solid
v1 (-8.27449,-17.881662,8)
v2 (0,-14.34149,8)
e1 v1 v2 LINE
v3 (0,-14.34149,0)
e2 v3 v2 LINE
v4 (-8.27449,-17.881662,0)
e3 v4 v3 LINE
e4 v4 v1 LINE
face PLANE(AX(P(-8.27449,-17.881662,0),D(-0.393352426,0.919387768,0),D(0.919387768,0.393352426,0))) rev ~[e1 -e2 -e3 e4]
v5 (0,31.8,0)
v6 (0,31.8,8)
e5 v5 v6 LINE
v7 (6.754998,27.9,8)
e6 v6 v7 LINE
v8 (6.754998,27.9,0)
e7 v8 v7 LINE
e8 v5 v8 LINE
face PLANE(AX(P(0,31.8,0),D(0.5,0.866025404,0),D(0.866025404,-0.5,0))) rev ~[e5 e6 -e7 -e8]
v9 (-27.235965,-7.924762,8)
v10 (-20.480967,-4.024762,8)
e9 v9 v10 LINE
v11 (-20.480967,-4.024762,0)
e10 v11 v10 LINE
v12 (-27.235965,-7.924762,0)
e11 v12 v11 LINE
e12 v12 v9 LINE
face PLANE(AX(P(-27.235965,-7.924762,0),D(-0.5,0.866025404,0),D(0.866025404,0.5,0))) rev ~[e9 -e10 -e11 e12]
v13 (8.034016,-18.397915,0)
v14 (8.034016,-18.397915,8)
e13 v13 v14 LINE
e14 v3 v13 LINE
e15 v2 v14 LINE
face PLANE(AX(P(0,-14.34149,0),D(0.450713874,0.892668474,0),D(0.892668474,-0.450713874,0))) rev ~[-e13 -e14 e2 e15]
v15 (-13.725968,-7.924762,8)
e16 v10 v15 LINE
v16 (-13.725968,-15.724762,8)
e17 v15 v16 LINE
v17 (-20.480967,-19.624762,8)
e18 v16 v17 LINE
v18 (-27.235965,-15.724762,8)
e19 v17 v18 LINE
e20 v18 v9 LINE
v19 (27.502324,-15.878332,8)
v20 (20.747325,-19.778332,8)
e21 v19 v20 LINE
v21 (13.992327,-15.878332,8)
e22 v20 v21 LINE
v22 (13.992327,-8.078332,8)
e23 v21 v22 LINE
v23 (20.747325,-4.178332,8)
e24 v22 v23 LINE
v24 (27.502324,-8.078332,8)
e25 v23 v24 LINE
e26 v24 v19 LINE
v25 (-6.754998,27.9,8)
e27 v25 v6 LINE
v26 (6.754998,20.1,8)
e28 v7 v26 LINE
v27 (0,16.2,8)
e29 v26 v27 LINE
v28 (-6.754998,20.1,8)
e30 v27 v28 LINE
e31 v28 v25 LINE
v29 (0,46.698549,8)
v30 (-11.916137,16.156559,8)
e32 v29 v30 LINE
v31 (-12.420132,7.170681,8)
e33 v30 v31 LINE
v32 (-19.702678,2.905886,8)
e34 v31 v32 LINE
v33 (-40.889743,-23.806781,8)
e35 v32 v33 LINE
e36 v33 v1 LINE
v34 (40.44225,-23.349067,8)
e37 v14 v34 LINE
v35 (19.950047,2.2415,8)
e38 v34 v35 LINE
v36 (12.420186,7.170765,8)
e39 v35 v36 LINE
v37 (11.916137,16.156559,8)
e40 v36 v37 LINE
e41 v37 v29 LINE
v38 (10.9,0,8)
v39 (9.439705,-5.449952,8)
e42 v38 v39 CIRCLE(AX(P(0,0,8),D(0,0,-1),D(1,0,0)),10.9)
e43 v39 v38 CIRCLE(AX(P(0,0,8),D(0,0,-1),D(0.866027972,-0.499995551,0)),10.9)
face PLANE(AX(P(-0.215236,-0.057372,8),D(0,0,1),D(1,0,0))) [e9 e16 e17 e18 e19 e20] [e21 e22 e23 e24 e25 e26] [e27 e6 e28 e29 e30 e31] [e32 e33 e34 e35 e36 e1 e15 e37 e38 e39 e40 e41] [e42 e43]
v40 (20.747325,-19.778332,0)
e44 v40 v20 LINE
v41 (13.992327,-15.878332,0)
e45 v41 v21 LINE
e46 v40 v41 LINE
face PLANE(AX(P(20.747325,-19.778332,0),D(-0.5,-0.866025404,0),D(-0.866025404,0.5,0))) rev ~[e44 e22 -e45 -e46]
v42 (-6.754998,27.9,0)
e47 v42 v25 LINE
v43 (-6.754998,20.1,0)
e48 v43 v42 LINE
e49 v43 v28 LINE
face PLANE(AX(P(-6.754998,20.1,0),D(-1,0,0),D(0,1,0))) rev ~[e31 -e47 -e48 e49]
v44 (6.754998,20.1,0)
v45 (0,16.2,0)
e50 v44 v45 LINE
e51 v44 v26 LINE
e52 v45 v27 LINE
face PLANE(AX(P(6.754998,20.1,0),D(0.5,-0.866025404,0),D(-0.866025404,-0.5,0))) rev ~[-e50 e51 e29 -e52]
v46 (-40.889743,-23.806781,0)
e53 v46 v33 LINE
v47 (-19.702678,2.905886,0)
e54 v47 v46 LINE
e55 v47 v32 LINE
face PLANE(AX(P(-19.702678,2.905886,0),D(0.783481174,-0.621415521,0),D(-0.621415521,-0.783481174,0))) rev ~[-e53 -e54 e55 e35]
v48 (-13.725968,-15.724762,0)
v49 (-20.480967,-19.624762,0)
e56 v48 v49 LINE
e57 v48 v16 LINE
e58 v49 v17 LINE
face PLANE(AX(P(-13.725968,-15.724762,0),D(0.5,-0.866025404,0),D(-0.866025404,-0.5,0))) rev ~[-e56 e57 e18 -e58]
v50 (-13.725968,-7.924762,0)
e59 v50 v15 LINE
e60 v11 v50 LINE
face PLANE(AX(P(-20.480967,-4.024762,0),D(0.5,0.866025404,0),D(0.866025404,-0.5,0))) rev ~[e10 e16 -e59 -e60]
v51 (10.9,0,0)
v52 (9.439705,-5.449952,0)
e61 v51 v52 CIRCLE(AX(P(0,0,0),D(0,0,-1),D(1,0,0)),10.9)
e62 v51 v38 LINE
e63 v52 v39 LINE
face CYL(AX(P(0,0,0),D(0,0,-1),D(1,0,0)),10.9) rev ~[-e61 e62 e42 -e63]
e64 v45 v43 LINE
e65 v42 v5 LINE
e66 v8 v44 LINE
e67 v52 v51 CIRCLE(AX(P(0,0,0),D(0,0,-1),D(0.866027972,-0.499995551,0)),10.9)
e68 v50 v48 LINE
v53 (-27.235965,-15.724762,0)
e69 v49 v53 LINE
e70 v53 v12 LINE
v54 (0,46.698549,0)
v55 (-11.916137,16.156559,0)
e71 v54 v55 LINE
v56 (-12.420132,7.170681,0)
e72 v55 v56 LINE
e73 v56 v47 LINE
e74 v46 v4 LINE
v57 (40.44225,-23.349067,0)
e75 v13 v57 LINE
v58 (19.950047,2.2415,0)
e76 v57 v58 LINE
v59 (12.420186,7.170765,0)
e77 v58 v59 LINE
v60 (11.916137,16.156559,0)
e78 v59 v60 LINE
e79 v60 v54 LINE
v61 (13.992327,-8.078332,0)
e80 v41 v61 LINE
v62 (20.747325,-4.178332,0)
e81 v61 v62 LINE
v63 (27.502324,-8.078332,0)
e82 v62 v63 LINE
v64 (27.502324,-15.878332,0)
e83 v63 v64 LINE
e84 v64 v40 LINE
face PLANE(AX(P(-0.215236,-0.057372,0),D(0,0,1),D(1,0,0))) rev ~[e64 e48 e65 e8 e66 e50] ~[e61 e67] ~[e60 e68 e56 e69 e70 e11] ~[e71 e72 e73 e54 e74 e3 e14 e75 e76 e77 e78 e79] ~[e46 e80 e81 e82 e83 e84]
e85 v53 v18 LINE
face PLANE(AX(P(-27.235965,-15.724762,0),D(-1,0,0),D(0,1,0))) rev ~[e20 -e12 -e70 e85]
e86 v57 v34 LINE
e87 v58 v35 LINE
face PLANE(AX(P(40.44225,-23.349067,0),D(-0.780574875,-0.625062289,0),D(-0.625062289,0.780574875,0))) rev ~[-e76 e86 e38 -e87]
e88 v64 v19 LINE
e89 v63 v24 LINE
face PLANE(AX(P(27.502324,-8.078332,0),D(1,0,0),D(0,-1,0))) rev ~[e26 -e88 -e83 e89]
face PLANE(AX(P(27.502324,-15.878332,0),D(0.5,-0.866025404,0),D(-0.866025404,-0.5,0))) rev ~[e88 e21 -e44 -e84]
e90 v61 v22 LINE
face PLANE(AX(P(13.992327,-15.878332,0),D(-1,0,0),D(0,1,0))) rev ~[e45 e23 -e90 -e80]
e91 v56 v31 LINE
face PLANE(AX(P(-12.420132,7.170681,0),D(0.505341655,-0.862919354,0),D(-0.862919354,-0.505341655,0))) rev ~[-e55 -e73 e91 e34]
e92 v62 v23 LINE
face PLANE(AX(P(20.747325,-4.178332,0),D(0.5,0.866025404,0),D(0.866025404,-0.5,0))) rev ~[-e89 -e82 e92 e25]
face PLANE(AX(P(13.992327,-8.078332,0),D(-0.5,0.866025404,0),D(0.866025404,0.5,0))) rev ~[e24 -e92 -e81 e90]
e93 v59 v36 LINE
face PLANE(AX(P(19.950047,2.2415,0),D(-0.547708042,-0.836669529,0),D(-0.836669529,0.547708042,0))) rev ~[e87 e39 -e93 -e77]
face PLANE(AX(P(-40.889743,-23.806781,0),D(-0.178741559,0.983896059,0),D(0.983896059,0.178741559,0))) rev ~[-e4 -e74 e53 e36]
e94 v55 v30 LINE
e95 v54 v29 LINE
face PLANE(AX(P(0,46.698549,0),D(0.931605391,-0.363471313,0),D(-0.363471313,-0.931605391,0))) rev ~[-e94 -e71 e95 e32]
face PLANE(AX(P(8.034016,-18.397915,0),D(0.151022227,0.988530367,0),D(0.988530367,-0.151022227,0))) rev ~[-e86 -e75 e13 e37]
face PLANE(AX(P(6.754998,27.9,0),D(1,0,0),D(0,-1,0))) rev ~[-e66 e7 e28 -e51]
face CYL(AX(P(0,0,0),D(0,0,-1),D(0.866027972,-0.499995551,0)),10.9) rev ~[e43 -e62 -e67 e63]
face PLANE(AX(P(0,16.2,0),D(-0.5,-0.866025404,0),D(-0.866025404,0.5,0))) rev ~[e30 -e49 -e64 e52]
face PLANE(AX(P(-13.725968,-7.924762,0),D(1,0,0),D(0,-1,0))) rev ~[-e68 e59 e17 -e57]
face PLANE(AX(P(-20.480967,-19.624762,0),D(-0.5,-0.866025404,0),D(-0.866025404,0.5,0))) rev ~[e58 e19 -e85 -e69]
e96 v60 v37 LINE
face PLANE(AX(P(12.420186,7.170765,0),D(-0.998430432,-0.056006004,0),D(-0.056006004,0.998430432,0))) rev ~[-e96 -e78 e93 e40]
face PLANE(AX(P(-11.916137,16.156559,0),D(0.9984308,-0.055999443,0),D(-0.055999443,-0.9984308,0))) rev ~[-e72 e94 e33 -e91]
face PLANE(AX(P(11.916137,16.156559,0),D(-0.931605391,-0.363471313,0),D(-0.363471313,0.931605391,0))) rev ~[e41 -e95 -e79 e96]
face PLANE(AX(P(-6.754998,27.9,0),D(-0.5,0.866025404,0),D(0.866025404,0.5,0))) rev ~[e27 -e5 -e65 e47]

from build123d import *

# Parameters (mm, degrees)
F1_DEPTH = 8


# Not quite as in the source:
# - ends of sketch curves that miss each other by under 0.0002 mm in the source are joined


with BuildPart() as f1:
    # F0 (on Top) → F1 (new body)
    with BuildSketch(Plane.XY):
        Polygon((8.0340162625, -18.397915233), (40.4422496394, -23.3490666912), (19.9500470696, 2.2415004228), (12.4201863904, 7.1707647293), (11.9161368405, 16.1565585761), (0, 46.6985489201), (-11.9161368405, 16.1565585761), (-12.4201318249, 7.170681376), (-19.702678316, 2.9058864326), (-40.8897429157, -23.8067811423), (-8.2744899158, -17.8816622036), (0, -14.3414903669), align=None)
        Polygon((-20.4809666485, -4.0247617542), (-13.725968499, -7.9247617542), (-13.725968499, -15.7247617542), (-20.4809666485, -19.6247617542), (-27.2359647981, -15.7247617542), (-27.2359647981, -7.9247617542), align=None, mode=Mode.SUBTRACT)
        Polygon((13.9923272284, -15.8783317751), (13.9923272284, -8.0783317751), (20.7473253779, -4.1783317751), (27.5023235274, -8.0783317751), (27.5023235274, -15.8783317751), (20.7473253779, -19.7783317751), align=None, mode=Mode.SUBTRACT)
        with BuildLine():
            ThreePointArc((-9.4396629017, -5.4500242478), (-2.8211411141, 10.5285878832), (10.9, 0))
            ThreePointArc((10.9, 0), (10.5285987532, -2.8211005467), (9.4397049001, -5.4499515043))
            ThreePointArc((9.4397049001, -5.4499515043), (4.19985e-05, -10.8999999999), (-9.4396629017, -5.4500242478))
        make_face(mode=Mode.SUBTRACT)
        Polygon((6.7549981495, 27.9), (6.7549981495, 20.1), (0, 16.2), (-6.7549981495, 20.1), (-6.7549981495, 27.9), (0, 31.8), align=None, mode=Mode.SUBTRACT)
    extrude(amount=F1_DEPTH)


solid = f1.part
